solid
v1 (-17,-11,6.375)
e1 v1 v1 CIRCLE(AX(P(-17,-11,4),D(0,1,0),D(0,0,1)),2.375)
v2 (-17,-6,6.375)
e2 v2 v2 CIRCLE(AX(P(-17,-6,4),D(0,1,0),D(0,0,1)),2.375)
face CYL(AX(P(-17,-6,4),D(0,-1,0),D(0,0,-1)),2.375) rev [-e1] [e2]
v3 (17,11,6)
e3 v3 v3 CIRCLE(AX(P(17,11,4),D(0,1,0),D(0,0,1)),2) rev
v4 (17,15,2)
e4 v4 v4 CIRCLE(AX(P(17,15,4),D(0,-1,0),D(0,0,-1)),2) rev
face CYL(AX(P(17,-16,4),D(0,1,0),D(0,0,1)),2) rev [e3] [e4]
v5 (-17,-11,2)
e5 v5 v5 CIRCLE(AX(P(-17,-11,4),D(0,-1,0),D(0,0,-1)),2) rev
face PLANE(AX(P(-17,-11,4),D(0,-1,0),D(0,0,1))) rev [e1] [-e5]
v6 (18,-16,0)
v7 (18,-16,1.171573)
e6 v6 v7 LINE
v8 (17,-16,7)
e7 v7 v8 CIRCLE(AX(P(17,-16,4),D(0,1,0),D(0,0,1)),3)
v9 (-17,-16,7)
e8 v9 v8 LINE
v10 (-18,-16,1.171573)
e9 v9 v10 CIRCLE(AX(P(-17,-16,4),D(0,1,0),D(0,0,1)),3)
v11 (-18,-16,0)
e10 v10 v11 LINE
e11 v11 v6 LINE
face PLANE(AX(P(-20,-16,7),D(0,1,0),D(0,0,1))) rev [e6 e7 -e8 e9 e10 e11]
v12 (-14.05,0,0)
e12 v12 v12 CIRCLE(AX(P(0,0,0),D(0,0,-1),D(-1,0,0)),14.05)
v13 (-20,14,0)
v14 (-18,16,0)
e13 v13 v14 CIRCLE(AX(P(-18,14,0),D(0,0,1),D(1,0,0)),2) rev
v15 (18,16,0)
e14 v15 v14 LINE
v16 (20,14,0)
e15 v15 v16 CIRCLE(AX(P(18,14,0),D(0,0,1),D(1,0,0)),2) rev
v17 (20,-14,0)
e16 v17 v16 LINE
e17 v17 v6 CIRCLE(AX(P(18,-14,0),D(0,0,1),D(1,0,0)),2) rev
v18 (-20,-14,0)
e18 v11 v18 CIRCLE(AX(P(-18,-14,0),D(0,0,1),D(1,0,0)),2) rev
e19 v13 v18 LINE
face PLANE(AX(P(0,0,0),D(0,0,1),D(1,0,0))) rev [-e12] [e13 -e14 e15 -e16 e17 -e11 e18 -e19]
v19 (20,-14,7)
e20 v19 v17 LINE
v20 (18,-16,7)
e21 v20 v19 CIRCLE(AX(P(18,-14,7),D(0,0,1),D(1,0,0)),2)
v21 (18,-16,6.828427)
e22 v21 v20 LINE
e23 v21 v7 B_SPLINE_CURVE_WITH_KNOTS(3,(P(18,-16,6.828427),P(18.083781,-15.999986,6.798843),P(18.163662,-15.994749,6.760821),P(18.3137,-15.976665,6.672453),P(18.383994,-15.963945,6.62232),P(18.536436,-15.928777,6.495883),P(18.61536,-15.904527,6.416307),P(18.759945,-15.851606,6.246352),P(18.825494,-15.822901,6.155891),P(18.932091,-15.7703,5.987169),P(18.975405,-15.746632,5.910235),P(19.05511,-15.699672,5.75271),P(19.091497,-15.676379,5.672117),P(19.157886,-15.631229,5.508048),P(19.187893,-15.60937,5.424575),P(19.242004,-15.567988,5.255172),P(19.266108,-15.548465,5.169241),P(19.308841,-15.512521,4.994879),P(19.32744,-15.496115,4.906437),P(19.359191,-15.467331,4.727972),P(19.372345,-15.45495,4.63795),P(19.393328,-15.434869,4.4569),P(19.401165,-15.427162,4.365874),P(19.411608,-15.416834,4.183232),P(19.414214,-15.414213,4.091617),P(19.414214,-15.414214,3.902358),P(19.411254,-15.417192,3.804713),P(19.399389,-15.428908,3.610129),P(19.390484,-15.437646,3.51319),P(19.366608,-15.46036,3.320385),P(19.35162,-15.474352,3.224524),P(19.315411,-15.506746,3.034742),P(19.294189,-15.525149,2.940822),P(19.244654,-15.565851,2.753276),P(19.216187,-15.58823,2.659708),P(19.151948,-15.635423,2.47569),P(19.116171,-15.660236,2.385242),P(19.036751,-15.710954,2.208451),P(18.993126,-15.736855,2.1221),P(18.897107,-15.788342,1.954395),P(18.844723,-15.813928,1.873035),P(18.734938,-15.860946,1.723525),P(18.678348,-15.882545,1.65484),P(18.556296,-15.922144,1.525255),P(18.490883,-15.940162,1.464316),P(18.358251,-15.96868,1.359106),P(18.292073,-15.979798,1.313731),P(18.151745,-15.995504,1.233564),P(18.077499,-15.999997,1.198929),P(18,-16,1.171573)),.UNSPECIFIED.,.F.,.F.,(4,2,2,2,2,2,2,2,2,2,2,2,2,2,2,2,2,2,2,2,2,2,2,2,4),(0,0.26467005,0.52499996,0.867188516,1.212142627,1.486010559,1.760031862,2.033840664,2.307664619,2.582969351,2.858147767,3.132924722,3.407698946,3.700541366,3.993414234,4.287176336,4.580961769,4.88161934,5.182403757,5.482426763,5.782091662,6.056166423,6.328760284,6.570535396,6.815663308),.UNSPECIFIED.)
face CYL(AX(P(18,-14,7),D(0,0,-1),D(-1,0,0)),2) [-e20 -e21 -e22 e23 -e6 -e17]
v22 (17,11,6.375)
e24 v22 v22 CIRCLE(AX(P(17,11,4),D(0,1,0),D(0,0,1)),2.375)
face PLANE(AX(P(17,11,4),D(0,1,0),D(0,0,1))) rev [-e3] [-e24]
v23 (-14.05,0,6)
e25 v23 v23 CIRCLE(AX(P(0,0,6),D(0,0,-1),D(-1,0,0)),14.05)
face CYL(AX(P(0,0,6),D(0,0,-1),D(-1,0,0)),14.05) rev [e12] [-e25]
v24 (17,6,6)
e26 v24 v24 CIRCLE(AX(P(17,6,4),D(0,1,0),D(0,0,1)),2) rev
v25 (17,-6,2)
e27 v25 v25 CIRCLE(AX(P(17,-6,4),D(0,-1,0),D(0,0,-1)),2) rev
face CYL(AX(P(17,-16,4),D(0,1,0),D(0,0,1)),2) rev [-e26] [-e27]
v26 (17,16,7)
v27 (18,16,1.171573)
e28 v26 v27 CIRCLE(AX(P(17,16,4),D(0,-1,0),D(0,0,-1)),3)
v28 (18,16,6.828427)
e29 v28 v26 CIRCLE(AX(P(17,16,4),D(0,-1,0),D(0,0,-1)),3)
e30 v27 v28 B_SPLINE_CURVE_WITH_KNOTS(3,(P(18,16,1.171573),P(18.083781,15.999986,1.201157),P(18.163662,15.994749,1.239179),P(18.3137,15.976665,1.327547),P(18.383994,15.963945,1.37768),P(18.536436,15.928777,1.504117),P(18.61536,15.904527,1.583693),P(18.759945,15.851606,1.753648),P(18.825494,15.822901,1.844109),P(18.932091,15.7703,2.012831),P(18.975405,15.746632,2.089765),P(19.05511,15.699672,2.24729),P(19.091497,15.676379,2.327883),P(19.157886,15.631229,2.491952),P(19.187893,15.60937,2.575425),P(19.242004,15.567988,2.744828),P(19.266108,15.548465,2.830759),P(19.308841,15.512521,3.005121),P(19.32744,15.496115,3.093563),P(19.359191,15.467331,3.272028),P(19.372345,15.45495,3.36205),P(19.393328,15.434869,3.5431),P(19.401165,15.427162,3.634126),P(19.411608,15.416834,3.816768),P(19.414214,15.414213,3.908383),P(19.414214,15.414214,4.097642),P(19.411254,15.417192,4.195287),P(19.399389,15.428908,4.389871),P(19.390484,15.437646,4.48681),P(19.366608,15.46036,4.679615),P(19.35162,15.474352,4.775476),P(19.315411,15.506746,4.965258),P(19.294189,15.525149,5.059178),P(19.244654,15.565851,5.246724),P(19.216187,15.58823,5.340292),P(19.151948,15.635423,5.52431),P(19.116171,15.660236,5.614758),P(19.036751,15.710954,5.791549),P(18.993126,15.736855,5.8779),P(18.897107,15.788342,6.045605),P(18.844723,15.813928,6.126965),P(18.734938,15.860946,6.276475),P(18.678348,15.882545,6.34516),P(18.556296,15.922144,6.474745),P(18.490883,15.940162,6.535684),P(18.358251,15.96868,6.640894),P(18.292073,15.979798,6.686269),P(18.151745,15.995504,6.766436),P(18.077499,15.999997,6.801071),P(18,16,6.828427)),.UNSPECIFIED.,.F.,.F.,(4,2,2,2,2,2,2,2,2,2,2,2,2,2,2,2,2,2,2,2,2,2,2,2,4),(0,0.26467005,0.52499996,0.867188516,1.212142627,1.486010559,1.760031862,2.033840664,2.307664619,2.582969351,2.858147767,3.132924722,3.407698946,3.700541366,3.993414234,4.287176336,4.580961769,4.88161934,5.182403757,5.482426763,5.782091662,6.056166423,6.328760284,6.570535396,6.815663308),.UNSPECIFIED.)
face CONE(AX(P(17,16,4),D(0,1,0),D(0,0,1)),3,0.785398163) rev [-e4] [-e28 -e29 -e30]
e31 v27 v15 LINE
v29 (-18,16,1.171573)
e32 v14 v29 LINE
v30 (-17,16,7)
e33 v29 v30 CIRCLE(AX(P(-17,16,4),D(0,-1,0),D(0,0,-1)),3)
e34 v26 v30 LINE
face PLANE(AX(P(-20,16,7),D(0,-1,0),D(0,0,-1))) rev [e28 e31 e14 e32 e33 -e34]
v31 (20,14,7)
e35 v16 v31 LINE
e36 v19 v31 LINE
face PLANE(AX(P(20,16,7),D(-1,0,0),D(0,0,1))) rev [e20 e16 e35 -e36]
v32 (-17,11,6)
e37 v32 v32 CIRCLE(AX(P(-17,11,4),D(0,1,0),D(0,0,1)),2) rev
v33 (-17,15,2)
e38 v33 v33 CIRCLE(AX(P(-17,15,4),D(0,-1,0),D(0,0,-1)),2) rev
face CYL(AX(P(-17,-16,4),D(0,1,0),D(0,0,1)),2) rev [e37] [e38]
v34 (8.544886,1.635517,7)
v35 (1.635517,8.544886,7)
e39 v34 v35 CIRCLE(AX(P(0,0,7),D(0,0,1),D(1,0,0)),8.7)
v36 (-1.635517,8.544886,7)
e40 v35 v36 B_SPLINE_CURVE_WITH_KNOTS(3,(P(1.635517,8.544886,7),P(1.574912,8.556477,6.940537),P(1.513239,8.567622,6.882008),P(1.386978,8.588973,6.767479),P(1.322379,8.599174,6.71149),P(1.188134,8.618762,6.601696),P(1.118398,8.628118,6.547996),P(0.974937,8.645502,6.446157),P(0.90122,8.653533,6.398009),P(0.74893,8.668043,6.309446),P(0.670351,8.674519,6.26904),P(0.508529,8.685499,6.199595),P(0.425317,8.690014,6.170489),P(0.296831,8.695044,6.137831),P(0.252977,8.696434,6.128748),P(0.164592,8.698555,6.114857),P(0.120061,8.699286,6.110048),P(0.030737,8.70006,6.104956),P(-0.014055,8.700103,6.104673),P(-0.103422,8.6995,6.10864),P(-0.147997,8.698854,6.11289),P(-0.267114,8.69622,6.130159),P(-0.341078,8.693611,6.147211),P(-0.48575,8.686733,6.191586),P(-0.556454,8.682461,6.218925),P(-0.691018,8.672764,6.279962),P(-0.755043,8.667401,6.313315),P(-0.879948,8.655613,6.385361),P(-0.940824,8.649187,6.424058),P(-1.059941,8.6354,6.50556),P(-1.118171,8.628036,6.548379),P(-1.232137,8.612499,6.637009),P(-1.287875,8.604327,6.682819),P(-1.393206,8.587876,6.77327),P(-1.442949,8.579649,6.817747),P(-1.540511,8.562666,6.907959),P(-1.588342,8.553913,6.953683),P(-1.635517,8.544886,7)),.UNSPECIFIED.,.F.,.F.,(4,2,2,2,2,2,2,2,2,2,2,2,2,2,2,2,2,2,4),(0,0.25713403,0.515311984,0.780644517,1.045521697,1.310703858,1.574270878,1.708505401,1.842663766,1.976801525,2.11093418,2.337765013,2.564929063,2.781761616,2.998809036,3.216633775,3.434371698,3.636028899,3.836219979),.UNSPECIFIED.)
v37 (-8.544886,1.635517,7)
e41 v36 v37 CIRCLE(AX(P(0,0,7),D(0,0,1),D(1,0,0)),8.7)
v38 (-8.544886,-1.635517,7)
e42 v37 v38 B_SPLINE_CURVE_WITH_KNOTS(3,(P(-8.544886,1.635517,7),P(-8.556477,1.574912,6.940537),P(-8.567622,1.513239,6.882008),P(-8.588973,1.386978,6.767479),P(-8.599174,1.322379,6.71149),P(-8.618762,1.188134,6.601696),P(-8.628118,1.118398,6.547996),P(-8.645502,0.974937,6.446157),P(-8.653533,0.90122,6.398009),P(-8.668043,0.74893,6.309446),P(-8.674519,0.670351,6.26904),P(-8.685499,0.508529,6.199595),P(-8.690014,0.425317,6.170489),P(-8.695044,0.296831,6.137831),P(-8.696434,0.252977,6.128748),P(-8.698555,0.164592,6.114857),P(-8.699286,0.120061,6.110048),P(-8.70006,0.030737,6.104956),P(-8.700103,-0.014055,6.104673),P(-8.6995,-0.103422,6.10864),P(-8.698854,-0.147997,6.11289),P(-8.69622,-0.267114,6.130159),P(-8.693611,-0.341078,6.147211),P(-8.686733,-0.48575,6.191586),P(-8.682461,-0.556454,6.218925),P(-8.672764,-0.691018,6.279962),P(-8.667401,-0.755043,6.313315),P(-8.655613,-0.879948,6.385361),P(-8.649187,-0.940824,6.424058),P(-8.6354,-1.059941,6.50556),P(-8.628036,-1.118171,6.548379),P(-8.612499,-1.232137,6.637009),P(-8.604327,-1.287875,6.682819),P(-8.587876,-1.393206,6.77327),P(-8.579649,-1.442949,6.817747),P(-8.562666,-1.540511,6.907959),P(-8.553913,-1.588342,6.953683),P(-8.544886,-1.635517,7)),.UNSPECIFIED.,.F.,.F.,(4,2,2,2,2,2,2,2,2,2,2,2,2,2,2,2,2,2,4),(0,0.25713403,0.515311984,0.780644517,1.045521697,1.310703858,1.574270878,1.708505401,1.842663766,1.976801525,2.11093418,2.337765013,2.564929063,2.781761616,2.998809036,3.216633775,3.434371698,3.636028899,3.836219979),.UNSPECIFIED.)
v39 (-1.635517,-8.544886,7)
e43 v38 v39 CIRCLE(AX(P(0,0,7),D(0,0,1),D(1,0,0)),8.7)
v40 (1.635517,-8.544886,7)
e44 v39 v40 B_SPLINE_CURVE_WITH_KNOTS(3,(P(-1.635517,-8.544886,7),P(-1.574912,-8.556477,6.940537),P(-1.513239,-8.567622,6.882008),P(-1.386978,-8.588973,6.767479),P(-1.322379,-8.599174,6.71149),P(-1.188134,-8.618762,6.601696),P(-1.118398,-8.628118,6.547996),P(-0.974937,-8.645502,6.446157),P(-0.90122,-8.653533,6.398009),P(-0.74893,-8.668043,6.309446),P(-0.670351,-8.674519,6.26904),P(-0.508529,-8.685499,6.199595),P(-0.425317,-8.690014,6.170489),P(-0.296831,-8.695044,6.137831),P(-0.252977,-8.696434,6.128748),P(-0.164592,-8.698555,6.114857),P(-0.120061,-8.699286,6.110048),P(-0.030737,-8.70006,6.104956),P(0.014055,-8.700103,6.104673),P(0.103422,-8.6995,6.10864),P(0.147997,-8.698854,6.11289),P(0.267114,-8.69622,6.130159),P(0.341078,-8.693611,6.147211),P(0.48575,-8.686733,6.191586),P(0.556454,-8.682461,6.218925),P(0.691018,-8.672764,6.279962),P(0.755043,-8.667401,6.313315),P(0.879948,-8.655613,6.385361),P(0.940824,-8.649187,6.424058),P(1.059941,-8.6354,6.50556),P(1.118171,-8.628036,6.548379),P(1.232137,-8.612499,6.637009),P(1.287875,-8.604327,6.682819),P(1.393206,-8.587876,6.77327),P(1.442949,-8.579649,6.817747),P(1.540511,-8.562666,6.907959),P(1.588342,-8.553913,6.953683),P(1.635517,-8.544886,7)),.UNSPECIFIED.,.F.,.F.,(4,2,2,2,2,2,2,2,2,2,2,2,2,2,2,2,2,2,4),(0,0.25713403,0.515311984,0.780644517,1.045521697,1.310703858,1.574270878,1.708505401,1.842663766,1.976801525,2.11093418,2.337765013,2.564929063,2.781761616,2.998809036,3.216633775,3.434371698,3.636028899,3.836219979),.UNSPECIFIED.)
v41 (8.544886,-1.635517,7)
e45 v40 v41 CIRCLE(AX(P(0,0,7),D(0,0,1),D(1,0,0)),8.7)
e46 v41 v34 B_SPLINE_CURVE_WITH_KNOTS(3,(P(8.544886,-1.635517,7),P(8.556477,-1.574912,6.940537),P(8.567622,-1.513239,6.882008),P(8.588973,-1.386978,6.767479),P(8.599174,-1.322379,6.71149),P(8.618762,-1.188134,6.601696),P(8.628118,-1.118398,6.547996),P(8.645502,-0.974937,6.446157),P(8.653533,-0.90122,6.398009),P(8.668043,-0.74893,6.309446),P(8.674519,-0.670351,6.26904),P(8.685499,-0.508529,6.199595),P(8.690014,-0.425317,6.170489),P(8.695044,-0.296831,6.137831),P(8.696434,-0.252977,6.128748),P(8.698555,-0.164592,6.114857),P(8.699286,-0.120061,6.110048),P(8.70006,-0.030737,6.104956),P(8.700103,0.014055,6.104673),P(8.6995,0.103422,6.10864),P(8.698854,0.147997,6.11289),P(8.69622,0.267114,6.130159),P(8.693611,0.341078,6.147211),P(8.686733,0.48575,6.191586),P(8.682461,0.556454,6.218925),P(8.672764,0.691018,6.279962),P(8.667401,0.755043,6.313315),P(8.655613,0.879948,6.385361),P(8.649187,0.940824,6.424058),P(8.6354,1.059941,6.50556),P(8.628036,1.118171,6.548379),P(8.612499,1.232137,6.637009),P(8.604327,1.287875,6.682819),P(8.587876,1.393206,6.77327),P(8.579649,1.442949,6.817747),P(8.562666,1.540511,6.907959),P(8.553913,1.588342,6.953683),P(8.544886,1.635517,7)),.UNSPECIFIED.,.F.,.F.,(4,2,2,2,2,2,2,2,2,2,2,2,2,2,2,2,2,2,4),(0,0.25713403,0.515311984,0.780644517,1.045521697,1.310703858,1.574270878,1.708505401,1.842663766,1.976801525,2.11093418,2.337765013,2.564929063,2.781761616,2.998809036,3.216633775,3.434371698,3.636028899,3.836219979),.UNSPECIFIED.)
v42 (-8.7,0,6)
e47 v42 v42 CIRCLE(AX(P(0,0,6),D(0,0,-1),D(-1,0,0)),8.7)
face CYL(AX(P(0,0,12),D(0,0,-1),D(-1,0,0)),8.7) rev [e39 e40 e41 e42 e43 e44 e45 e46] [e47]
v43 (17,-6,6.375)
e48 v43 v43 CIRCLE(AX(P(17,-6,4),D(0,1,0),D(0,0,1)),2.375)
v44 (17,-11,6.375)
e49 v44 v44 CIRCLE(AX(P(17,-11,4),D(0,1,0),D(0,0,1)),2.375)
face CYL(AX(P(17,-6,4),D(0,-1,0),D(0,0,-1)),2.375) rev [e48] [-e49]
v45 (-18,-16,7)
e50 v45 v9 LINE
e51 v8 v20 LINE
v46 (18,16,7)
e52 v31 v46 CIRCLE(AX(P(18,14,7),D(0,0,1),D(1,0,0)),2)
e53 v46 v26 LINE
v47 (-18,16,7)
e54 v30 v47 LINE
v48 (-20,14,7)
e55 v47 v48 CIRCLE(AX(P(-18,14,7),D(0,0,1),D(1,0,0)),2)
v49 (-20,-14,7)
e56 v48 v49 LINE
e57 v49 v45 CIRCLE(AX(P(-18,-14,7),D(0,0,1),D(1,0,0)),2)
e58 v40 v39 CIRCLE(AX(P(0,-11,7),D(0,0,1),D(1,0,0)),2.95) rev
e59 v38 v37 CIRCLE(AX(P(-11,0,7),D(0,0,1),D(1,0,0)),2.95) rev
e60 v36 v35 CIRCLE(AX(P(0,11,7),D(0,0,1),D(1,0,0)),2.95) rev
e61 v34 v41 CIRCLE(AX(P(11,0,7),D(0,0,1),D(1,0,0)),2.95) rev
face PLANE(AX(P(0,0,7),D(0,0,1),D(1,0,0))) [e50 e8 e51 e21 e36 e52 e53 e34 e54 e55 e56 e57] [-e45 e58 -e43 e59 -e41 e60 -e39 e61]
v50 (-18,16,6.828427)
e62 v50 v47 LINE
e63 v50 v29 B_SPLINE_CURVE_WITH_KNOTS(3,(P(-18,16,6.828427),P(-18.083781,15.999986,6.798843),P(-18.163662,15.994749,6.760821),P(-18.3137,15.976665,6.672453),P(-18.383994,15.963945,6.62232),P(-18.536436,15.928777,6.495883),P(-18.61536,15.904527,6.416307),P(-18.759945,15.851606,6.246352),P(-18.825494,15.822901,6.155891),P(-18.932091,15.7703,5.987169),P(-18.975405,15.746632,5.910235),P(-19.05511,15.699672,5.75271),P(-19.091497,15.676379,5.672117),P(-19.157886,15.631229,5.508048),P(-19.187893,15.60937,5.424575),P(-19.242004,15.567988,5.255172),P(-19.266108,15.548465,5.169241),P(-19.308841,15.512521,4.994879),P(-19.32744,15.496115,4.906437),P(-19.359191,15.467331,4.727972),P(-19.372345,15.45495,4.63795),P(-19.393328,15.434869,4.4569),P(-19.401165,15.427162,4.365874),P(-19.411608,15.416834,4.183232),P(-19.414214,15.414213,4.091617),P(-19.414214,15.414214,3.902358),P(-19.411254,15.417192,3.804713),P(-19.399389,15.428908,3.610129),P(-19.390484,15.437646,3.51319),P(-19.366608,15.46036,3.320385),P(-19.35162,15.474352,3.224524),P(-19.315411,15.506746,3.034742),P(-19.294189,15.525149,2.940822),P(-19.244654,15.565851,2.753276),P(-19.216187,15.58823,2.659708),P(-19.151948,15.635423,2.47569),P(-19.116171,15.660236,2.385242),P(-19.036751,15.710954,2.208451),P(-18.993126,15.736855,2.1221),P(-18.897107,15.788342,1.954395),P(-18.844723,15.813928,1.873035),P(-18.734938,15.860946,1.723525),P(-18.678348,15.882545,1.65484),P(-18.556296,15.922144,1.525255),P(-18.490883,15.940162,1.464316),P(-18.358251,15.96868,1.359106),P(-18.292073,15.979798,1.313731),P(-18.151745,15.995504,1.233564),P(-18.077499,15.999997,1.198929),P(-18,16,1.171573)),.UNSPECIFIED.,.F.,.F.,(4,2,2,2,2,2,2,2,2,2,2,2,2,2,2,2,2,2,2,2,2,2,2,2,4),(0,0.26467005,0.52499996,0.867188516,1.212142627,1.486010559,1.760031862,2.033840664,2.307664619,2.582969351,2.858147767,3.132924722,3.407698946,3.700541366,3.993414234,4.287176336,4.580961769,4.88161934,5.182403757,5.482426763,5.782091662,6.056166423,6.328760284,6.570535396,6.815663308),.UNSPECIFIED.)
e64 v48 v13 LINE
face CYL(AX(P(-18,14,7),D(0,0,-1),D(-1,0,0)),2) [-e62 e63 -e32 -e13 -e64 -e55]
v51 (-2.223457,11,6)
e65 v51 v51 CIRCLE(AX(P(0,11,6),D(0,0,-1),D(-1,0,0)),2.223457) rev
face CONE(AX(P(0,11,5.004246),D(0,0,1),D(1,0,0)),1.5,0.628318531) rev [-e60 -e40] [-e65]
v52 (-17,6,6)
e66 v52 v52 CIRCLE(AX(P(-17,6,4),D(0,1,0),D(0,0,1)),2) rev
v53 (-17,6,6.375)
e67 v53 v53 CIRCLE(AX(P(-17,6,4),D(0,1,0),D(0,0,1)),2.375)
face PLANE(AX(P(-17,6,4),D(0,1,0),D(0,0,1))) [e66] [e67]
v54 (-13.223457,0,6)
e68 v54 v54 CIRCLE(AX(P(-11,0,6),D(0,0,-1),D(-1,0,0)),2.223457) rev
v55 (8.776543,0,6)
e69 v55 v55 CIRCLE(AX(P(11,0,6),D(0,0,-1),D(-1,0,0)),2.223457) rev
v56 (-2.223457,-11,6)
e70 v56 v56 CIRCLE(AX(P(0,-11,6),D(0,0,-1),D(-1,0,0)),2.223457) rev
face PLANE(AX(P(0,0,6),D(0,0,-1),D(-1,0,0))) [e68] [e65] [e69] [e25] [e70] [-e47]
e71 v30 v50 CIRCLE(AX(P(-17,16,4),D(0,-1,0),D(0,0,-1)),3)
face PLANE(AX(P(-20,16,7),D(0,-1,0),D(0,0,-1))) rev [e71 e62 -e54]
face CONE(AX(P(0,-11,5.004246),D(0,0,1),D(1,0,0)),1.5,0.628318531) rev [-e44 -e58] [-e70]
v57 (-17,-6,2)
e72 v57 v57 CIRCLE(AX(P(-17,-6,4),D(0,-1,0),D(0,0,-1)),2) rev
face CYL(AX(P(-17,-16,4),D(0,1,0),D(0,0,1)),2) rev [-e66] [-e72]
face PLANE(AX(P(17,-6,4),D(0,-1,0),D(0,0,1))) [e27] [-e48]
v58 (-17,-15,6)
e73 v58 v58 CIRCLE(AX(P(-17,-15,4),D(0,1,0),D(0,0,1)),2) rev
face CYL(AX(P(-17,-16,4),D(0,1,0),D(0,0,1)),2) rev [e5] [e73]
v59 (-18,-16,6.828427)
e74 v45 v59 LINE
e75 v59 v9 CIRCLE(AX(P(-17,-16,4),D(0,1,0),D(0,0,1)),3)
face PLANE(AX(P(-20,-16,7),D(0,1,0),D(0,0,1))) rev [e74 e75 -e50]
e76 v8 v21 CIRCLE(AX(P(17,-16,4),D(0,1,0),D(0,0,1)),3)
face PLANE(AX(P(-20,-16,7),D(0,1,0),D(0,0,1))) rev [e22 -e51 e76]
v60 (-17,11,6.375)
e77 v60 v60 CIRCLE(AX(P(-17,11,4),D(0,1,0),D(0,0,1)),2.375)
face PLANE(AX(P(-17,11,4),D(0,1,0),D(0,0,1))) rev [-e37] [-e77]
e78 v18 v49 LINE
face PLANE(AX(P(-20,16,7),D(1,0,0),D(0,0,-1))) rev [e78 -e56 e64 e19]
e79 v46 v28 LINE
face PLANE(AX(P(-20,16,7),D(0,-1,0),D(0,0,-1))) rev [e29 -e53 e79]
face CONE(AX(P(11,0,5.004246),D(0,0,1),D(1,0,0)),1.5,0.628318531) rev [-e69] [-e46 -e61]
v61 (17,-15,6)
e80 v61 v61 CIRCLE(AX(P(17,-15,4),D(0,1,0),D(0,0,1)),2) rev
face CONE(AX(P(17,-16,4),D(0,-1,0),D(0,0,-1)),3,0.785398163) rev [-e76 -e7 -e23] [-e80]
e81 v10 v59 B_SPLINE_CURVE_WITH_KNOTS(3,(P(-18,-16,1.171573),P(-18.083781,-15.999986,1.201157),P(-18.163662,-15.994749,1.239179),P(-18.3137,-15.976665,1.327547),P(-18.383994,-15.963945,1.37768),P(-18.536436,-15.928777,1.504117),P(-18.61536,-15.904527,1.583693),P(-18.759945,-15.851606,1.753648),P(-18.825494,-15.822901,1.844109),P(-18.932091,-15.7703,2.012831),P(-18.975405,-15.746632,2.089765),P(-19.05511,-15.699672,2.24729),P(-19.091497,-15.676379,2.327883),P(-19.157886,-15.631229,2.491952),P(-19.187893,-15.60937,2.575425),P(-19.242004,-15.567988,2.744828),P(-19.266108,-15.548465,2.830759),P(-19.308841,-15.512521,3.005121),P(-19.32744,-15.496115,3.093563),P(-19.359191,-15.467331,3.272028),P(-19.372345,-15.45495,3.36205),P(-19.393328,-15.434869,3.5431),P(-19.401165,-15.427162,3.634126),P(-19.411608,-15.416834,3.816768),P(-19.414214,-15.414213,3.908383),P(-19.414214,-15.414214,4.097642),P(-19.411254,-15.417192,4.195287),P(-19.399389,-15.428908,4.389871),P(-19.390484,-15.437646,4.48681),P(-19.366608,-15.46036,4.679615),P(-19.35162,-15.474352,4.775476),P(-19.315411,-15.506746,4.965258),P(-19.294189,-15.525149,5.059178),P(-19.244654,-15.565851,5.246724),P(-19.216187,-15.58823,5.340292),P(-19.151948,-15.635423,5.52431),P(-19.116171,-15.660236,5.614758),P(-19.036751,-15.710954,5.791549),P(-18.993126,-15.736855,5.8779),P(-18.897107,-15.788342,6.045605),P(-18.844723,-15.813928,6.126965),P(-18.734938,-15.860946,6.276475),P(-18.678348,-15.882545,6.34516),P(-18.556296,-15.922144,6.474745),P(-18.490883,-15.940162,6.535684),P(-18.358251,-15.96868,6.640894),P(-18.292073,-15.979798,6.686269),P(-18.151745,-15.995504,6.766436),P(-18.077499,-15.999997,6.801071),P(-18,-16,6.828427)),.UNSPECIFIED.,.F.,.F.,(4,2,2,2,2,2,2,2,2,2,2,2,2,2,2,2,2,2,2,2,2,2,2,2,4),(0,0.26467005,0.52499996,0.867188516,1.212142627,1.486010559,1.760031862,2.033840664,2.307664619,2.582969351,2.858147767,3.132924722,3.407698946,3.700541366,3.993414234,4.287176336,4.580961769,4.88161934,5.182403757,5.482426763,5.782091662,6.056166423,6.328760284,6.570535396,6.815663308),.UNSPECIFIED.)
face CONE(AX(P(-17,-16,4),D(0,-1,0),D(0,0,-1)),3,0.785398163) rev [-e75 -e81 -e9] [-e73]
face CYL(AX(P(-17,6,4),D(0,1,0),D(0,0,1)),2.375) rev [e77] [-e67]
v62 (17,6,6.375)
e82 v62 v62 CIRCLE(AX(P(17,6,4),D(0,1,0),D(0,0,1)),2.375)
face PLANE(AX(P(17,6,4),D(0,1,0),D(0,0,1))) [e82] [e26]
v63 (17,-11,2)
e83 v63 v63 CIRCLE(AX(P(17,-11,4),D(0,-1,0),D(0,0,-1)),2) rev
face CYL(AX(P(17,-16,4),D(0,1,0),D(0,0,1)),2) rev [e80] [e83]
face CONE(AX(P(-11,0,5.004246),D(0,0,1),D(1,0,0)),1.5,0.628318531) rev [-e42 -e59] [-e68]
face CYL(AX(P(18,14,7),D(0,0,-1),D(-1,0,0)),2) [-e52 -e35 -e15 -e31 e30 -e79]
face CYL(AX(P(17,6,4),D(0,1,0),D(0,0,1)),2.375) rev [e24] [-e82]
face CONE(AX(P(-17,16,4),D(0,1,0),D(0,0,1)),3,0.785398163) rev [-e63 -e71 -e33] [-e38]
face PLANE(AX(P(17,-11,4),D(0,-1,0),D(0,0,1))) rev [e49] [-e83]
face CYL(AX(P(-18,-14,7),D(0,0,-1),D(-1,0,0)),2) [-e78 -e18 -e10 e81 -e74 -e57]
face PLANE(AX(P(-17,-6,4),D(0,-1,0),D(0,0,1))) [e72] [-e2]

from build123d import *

# Parameters (mm, degrees)
SKETCH1_W               = 40
SKETCH1_H               = 32
BOSS_EXTRUDE1_DEPTH     = 7
SKETCH2_R               = 14.05
CUT_EXTRUDE1_DEPTH      = 6
SKETCH3_R               = 8.7
CUT_EXTRUDE2_DEPTH      = 6
SKETCH4_R               = 1.5
CUT_EXTRUDE3_DEPTH      = 6
CHAMFER1_SIZE           = 1.45
CHAMFER1_SIZE_2         = 1.995753785
CUT_EXTRUDE4_DEPTH      = 39.379682143
CUT_EXTRUDE4_DEPTH_BACK = 39.379682143
SKETCH5_R               = 2
FILLET1_R               = 2
CUT_EXTRUDE5_START      = -5
SKETCH6_R               = 2.375
CUT_EXTRUDE5_DEPTH      = 5
CHAMFER2_SIZE           = 1


with BuildPart() as part:
    # Sketch1 → Boss-Extrude1 (new body)
    with BuildSketch(Plane.XY):
        Rectangle(SKETCH1_W, SKETCH1_H)
    extrude(amount=BOSS_EXTRUDE1_DEPTH)

    # Sketch2 → Cut-Extrude1 (cut)
    with BuildSketch(Plane(origin=(0, 0, 0), x_dir=(-1, 0, 0), z_dir=(0, 0, -1))):
        Circle(SKETCH2_R)
    extrude(amount=-CUT_EXTRUDE1_DEPTH, mode=Mode.SUBTRACT)

    # Sketch3 → Cut-Extrude2 (cut)
    with BuildSketch(Plane(origin=(0, 0, 6), x_dir=(-1, 0, 0), z_dir=(0, 0, -1))):
        Circle(SKETCH3_R)
    extrude(amount=-CUT_EXTRUDE2_DEPTH, mode=Mode.SUBTRACT)

    # Sketch4 → Cut-Extrude3 (cut)
    with BuildSketch(Plane(origin=(0, 0, 6), x_dir=(-1, 0, 0), z_dir=(0, 0, -1))):
        with Locations((0, 11)):
            Circle(SKETCH4_R)
        with Locations((11, 0)):
            Circle(SKETCH4_R)
        with Locations((0, -11)):
            Circle(SKETCH4_R)
        with Locations((-11, 0)):
            Circle(SKETCH4_R)
    extrude(amount=-CUT_EXTRUDE3_DEPTH, mode=Mode.SUBTRACT)

    # Chamfer1
    # the kernel refuses this chamfer: 1.995753785, 1.45 mm, written as the material it takes off along each edge
    with BuildSketch(Plane(origin=(0, -11, 7), x_dir=(-1, 0, 0), z_dir=(0, -1, 0))) as chamfer1_piece_1:
        Polygon((1.5 + CHAMFER1_SIZE, 0), (1.5, CHAMFER1_SIZE_2), (1.5, 0), align=None)
    revolve(axis=Axis((0, -11, 7), (0, 0, -1)), mode=Mode.SUBTRACT)
    with BuildSketch(Plane(origin=(-11, 0, 7), x_dir=(-1, 0, 0), z_dir=(0, -1, 0))) as chamfer1_piece_2:
        Polygon((1.5 + CHAMFER1_SIZE, 0), (1.5, CHAMFER1_SIZE_2), (1.5, 0), align=None)
    revolve(axis=Axis((-11, 0, 7), (0, 0, -1)), mode=Mode.SUBTRACT)
    with BuildSketch(Plane(origin=(11, 0, 7), x_dir=(-1, 0, 0), z_dir=(0, -1, 0))) as chamfer1_piece_3:
        Polygon((1.5 + CHAMFER1_SIZE, 0), (1.5, CHAMFER1_SIZE_2), (1.5, 0), align=None)
    revolve(axis=Axis((11, 0, 7), (0, 0, -1)), mode=Mode.SUBTRACT)
    with BuildSketch(Plane(origin=(0, 11, 7), x_dir=(-1, 0, 0), z_dir=(0, -1, 0))) as chamfer1_piece_4:
        Polygon((1.5 + CHAMFER1_SIZE, 0), (1.5, CHAMFER1_SIZE_2), (1.5, 0), align=None)
    revolve(axis=Axis((0, 11, 7), (0, 0, -1)), mode=Mode.SUBTRACT)

    # Sketch5 → Cut-Extrude4 (cut, two sides: drawn at the far end of the back side and taken through both)
    with BuildSketch(Plane(origin=(0, 16, 0), x_dir=(1, 0, 0), z_dir=(0, 1, 0)).offset(-CUT_EXTRUDE4_DEPTH_BACK)):
        with Locations(Location((-17, -4, 0), (0, 0, 270))):
            Circle(SKETCH5_R)
        with Locations(Location((17, -4, 0), (0, 0, 270))):
            Circle(SKETCH5_R)
    extrude(amount=CUT_EXTRUDE4_DEPTH + CUT_EXTRUDE4_DEPTH_BACK, mode=Mode.SUBTRACT)

    # Fillet1
    # the kernel refuses this fillet: 2 mm, written as the material it takes off along each edge
    with BuildSketch(Plane(origin=(20, -16, -5), x_dir=(0, 1, 0), z_dir=(0, 0, 1)), Plane(origin=(20, 16, -5), x_dir=(-1, 0, 0), z_dir=(0, 0, 1))) as fillet1_piece_1:
        with BuildLine():
            CenterArc((FILLET1_R, FILLET1_R), FILLET1_R, 180, 90)
            Line((0, FILLET1_R), (0, 0))
            Line((0, 0), (FILLET1_R, 0))
        make_face()
    extrude(amount=17, mode=Mode.SUBTRACT)
    with BuildSketch(Plane(origin=(-20, -16, -5), x_dir=(0, 1, 0), z_dir=(0, 0, 1)), Plane(origin=(-20, 16, -5), x_dir=(1, 0, 0), z_dir=(0, 0, 1))) as fillet1_piece_2:
        with BuildLine():
            CenterArc((FILLET1_R, -FILLET1_R), FILLET1_R, 90, 90)
            Line((0, -FILLET1_R), (0, 0))
            Line((0, 0), (FILLET1_R, 0))
        make_face()
    extrude(amount=17, mode=Mode.SUBTRACT)

    # Sketch6 → Cut-Extrude5 (cut)
    with BuildSketch(Plane(origin=(0, 16, 0), x_dir=(1, 0, 0), z_dir=(0, 1, 0)).offset(CUT_EXTRUDE5_START)):
        with Locations(Location((-17, -4, 0), (0, 0, 270))):
            Circle(SKETCH6_R)
        with Locations(Location((17, -4, 0), (0, 0, 270))):
            Circle(SKETCH6_R)
    cut_extrude5 = extrude(amount=-CUT_EXTRUDE5_DEPTH, mode=Mode.SUBTRACT)

    # Mirror1: Cut-Extrude5 across plane
    add(cut_extrude5.mirror(Plane.ZX), mode=Mode.SUBTRACT)

    # Chamfer2
    # the kernel refuses this chamfer: 1 mm, written as the material it takes off along each edge
    with BuildSketch(Plane(origin=(17, -16, 4), x_dir=(0.006283143965557505, 0, 0.9999802608561372), z_dir=(-0.9999802608561372, 0, 0.006283143965557505))) as chamfer2_piece_1:
        Polygon((2 + CHAMFER2_SIZE, 0), (2, CHAMFER2_SIZE), (2, 0), align=None)
    revolve(axis=Axis((17, -16, 4), (0, 1, 0)), revolution_arc=359.64, mode=Mode.SUBTRACT)
    with BuildSketch(Plane(origin=(-17, -16, 4), x_dir=(0, 0, 1), z_dir=(-1, 0, 0))) as chamfer2_piece_2:
        Polygon((2 + CHAMFER2_SIZE, 0), (2, CHAMFER2_SIZE), (2, 0), align=None)
    revolve(axis=Axis((-17, -16, 4), (0, 1, 0)), revolution_arc=359.64, mode=Mode.SUBTRACT)
    with BuildSketch(Plane(origin=(-17, 16, 4), x_dir=(0, 0, 1), z_dir=(-1, 0, 0))) as chamfer2_piece_3:
        Polygon((2 + CHAMFER2_SIZE, 0), (2, -CHAMFER2_SIZE), (2, 0), align=None)
    revolve(axis=Axis((-17, 16, 4), (0, 1, 0)), revolution_arc=359.64, mode=Mode.SUBTRACT)
    with BuildSketch(Plane(origin=(17, 16, 4), x_dir=(0.006283143965557505, 0, 0.9999802608561372), z_dir=(-0.9999802608561372, 0, 0.006283143965557505))) as chamfer2_piece_4:
        Polygon((2 + CHAMFER2_SIZE, 0), (2, -CHAMFER2_SIZE), (2, 0), align=None)
    revolve(axis=Axis((17, 16, 4), (0, 1, 0)), revolution_arc=359.64, mode=Mode.SUBTRACT)
    with BuildSketch(Plane(origin=(17, 16, 4), x_dir=(0, 0, 1), z_dir=(-1, 0, 0))) as chamfer2_piece_5:
        Polygon((2 + CHAMFER2_SIZE, 0), (2, -CHAMFER2_SIZE), (2, 0), align=None)
    revolve(axis=Axis((17, 16, 4), (0, 1, 0)), revolution_arc=251.029734773, mode=Mode.SUBTRACT)
    with BuildSketch(Plane(origin=(-17, 16, 4), x_dir=(0.9456874082674533, 0, -0.3250774151558165), z_dir=(0.3250774151558165, 0, 0.9456874082674533))) as chamfer2_piece_6:
        Polygon((2 + CHAMFER2_SIZE, 0), (2, -CHAMFER2_SIZE), (2, 0), align=None)
    revolve(axis=Axis((-17, 16, 4), (0, 1, 0)), revolution_arc=251.029734773, mode=Mode.SUBTRACT)
    with BuildSketch(Plane(origin=(-17, -16, 4), x_dir=(0.9456874082674562, 0, -0.3250774151558082), z_dir=(0.3250774151558082, 0, 0.9456874082674562))) as chamfer2_piece_7:
        Polygon((2 + CHAMFER2_SIZE, 0), (2, CHAMFER2_SIZE), (2, 0), align=None)
    revolve(axis=Axis((-17, -16, 4), (0, 1, 0)), revolution_arc=251.029734773, mode=Mode.SUBTRACT)
    with BuildSketch(Plane(origin=(17, -16, 4), x_dir=(0, 0, 1), z_dir=(-1, 0, 0))) as chamfer2_piece_8:
        Polygon((2 + CHAMFER2_SIZE, 0), (2, CHAMFER2_SIZE), (2, 0), align=None)
    revolve(axis=Axis((17, -16, 4), (0, 1, 0)), revolution_arc=251.029734773, mode=Mode.SUBTRACT)


solid = part.part
